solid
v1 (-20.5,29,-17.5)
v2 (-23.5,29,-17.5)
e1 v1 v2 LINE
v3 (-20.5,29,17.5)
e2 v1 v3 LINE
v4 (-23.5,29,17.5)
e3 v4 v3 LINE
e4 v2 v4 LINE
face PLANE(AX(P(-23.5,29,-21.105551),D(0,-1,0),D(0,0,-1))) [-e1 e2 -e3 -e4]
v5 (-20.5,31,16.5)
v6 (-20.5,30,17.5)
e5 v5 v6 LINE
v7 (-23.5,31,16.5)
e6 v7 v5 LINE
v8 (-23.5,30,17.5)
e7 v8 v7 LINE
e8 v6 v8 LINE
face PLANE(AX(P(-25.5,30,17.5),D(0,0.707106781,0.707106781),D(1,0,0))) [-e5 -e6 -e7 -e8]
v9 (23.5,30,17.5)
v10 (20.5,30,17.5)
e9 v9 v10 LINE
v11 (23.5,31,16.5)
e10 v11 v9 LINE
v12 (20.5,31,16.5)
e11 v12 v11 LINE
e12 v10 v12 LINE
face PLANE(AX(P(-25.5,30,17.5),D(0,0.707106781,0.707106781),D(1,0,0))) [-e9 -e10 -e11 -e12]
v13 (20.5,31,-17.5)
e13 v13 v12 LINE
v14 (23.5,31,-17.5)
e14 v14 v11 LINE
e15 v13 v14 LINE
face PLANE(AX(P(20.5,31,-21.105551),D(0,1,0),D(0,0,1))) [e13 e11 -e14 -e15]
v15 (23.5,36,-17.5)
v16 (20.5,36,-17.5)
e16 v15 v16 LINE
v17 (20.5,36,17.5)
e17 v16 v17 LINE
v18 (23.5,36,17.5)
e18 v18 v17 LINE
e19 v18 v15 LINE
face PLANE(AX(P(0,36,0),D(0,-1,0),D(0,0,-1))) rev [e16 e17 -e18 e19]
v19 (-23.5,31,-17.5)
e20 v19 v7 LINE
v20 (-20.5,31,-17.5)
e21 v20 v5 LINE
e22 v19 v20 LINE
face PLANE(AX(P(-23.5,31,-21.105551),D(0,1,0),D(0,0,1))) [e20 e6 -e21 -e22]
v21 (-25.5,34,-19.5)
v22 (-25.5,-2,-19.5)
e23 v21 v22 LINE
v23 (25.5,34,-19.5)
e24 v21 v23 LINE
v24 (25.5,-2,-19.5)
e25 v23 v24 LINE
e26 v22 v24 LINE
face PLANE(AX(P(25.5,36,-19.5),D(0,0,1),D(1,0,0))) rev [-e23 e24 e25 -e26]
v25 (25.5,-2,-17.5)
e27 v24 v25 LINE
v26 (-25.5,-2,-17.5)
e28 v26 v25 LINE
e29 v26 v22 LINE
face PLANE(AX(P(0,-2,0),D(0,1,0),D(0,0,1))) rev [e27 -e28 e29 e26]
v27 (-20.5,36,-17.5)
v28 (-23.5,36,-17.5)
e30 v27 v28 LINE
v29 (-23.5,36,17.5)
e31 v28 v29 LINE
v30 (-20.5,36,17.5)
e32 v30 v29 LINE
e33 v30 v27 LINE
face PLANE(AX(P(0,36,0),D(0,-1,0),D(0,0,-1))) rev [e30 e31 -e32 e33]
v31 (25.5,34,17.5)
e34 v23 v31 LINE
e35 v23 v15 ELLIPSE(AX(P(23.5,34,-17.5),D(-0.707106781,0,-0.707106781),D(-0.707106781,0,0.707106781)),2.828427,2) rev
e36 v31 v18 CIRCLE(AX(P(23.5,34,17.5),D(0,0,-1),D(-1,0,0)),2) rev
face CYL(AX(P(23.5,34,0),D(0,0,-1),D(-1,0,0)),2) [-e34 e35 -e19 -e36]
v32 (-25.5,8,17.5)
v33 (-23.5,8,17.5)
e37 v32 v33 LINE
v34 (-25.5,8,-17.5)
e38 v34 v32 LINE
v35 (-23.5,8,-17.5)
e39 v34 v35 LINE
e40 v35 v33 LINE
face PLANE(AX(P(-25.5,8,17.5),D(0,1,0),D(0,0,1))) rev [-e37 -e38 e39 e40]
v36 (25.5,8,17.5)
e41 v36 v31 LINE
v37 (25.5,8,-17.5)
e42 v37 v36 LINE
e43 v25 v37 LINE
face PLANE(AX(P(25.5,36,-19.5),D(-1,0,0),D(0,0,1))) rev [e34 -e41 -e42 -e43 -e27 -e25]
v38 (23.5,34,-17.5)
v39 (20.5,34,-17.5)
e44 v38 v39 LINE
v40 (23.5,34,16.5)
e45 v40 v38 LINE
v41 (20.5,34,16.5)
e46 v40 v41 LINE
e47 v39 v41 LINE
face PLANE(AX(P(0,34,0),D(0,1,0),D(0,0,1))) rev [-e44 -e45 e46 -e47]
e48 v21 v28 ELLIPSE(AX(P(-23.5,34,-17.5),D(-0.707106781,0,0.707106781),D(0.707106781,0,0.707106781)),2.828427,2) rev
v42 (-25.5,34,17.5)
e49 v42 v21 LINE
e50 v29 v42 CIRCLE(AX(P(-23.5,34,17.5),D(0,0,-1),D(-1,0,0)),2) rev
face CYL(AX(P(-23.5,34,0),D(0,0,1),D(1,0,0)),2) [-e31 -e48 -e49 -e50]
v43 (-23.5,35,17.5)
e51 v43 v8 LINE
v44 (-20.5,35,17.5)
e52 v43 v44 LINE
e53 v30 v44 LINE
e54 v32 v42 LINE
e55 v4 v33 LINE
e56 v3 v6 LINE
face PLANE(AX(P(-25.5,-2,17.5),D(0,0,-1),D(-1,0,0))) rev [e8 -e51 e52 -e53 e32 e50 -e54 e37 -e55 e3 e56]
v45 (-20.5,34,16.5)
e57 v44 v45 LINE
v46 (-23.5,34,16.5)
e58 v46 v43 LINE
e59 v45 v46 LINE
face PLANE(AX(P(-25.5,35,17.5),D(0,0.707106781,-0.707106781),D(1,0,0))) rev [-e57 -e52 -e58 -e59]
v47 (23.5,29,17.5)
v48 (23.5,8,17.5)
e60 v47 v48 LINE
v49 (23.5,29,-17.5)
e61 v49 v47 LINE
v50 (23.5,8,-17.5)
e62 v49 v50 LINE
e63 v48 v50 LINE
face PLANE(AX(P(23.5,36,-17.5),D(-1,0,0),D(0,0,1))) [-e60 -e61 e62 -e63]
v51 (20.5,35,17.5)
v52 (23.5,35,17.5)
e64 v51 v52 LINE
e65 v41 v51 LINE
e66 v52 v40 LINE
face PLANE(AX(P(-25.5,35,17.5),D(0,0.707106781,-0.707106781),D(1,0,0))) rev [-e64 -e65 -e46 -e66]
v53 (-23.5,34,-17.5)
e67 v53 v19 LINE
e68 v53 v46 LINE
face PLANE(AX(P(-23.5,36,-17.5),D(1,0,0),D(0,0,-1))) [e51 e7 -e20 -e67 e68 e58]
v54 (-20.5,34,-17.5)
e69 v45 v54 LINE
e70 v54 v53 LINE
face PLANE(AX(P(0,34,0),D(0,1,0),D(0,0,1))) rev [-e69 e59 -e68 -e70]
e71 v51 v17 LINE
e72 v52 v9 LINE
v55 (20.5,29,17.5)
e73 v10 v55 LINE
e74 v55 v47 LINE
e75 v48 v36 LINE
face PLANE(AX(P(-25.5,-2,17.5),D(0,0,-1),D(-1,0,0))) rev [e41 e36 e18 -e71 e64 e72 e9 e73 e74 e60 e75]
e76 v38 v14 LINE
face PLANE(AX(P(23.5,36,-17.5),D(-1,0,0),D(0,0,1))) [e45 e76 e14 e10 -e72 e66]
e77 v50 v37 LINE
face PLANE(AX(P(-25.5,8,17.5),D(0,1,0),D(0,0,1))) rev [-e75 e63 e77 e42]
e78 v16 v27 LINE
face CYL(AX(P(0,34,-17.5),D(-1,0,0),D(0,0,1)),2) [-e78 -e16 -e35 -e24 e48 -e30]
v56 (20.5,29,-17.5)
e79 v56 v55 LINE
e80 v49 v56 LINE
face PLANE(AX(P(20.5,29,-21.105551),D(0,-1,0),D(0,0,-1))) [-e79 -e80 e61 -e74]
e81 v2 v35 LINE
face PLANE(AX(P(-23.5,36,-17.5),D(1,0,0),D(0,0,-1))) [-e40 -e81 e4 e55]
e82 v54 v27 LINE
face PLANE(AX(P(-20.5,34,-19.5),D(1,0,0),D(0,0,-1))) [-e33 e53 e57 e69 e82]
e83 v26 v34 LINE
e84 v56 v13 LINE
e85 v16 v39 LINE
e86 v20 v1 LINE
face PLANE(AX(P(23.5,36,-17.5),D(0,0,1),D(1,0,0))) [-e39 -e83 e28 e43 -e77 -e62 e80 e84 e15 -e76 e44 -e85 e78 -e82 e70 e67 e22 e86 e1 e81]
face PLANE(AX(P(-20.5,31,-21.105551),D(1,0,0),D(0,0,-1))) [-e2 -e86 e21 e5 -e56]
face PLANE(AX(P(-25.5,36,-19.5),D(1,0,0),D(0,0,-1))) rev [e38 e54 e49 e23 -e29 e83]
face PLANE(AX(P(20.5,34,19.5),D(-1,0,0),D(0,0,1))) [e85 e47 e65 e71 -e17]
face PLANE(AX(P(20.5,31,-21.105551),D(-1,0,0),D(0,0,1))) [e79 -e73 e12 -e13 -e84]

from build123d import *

# Parameters (mm, degrees)
CROQUIS1_W              = 51
CROQUIS1_H              = 39
CROQUIS1_W_2            = 47
CROQUIS1_H_2            = 35
SALIENTE_EXTRUIR1_DEPTH = 36
CROQUIS2_W              = 51
CROQUIS2_H              = 39
SALIENTE_EXTRUIR2_DEPTH = 2
CROQUIS3_W              = 5
CROQUIS3_H              = 39
SALIENTE_EXTRUIR3_DEPTH = 2
CROQUIS4_W              = 51
CROQUIS4_H              = 2
CORTAR_EXTRUIR1_DEPTH   = 50.744346412
CROQUIS5_W              = 3
CROQUIS5_H              = 2
SALIENTE_EXTRUIR4_DEPTH = 35
REDONDEO1_R             = 2
CHAFL_N1_SIZE           = 1
CROQUIS6_W              = 35
CROQUIS6_H              = 10
CORTAR_EXTRUIR2_DEPTH   = 66.40068807


with BuildPart() as part:
    # Croquis1 → Saliente-Extruir1 (new body)
    with BuildSketch(Plane(origin=(0, 0, 0), x_dir=(1, 0, 0), z_dir=(0, 1, 0))):
        Rectangle(CROQUIS1_W, CROQUIS1_H)
        Rectangle(CROQUIS1_W_2, CROQUIS1_H_2, mode=Mode.SUBTRACT)
    extrude(amount=SALIENTE_EXTRUIR1_DEPTH)

    # Croquis2 → Saliente-Extruir2 (add)
    with BuildSketch(Plane.XZ):
        Rectangle(CROQUIS2_W, CROQUIS2_H)
    extrude(amount=SALIENTE_EXTRUIR2_DEPTH)

    # Croquis3 → Saliente-Extruir3 (add)
    with BuildSketch(Plane(origin=(0, 36, 0), x_dir=(1, 0, 0), z_dir=(0, 1, 0))):
        with Locations((-23, 0)):
            Rectangle(CROQUIS3_W, CROQUIS3_H)
        with Locations((23, 0)):
            Rectangle(CROQUIS3_W, CROQUIS3_H)
    extrude(amount=-SALIENTE_EXTRUIR3_DEPTH)

    # Croquis4 → Cortar-Extruir1 (cut, through all)
    with BuildSketch(Plane(origin=(0, 36, 0), x_dir=(1, 0, 0), z_dir=(0, 1, 0))):
        with Locations((0, -18.5)):
            Rectangle(CROQUIS4_W, CROQUIS4_H)
    extrude(amount=-CORTAR_EXTRUIR1_DEPTH, mode=Mode.SUBTRACT)

    # Croquis5 → Saliente-Extruir4 (add)
    with BuildSketch(Plane.XY.offset(17.5)):
        with Locations((-22, 30)):
            Rectangle(CROQUIS5_W, CROQUIS5_H)
        with Locations((22, 30)):
            Rectangle(CROQUIS5_W, CROQUIS5_H)
    extrude(amount=-SALIENTE_EXTRUIR4_DEPTH)

    # Redondeo1
    redondeo1_edges = [part.edges().sort_by_distance(p)[0] for p in [
        (-25.5, 36, -1),
        (0, 36, -19.5),
        (25.5, 36, -1),
    ]]
    fillet(redondeo1_edges, radius=REDONDEO1_R - 0.0001)  # a hair under: the kernel refuses the full size

    # Chaflán1
    chafl_n1_edges = [part.edges().sort_by_distance(p)[0] for p in [
        (-22, 31, 17.5),
        (22, 31, 17.5),
        (-22, 34, 17.5),
        (22, 34, 17.5),
    ]]
    chamfer(chafl_n1_edges, length=CHAFL_N1_SIZE)

    # Croquis6 → Cortar-Extruir2 (cut, through all)
    with BuildSketch(Plane(origin=(25.5, 0, 0), x_dir=(0, 0, -1), z_dir=(1, 0, 0))):
        with Locations((0, 3)):
            Rectangle(CROQUIS6_W, CROQUIS6_H)
    extrude(amount=-CORTAR_EXTRUIR2_DEPTH, mode=Mode.SUBTRACT)


solid = part.part
